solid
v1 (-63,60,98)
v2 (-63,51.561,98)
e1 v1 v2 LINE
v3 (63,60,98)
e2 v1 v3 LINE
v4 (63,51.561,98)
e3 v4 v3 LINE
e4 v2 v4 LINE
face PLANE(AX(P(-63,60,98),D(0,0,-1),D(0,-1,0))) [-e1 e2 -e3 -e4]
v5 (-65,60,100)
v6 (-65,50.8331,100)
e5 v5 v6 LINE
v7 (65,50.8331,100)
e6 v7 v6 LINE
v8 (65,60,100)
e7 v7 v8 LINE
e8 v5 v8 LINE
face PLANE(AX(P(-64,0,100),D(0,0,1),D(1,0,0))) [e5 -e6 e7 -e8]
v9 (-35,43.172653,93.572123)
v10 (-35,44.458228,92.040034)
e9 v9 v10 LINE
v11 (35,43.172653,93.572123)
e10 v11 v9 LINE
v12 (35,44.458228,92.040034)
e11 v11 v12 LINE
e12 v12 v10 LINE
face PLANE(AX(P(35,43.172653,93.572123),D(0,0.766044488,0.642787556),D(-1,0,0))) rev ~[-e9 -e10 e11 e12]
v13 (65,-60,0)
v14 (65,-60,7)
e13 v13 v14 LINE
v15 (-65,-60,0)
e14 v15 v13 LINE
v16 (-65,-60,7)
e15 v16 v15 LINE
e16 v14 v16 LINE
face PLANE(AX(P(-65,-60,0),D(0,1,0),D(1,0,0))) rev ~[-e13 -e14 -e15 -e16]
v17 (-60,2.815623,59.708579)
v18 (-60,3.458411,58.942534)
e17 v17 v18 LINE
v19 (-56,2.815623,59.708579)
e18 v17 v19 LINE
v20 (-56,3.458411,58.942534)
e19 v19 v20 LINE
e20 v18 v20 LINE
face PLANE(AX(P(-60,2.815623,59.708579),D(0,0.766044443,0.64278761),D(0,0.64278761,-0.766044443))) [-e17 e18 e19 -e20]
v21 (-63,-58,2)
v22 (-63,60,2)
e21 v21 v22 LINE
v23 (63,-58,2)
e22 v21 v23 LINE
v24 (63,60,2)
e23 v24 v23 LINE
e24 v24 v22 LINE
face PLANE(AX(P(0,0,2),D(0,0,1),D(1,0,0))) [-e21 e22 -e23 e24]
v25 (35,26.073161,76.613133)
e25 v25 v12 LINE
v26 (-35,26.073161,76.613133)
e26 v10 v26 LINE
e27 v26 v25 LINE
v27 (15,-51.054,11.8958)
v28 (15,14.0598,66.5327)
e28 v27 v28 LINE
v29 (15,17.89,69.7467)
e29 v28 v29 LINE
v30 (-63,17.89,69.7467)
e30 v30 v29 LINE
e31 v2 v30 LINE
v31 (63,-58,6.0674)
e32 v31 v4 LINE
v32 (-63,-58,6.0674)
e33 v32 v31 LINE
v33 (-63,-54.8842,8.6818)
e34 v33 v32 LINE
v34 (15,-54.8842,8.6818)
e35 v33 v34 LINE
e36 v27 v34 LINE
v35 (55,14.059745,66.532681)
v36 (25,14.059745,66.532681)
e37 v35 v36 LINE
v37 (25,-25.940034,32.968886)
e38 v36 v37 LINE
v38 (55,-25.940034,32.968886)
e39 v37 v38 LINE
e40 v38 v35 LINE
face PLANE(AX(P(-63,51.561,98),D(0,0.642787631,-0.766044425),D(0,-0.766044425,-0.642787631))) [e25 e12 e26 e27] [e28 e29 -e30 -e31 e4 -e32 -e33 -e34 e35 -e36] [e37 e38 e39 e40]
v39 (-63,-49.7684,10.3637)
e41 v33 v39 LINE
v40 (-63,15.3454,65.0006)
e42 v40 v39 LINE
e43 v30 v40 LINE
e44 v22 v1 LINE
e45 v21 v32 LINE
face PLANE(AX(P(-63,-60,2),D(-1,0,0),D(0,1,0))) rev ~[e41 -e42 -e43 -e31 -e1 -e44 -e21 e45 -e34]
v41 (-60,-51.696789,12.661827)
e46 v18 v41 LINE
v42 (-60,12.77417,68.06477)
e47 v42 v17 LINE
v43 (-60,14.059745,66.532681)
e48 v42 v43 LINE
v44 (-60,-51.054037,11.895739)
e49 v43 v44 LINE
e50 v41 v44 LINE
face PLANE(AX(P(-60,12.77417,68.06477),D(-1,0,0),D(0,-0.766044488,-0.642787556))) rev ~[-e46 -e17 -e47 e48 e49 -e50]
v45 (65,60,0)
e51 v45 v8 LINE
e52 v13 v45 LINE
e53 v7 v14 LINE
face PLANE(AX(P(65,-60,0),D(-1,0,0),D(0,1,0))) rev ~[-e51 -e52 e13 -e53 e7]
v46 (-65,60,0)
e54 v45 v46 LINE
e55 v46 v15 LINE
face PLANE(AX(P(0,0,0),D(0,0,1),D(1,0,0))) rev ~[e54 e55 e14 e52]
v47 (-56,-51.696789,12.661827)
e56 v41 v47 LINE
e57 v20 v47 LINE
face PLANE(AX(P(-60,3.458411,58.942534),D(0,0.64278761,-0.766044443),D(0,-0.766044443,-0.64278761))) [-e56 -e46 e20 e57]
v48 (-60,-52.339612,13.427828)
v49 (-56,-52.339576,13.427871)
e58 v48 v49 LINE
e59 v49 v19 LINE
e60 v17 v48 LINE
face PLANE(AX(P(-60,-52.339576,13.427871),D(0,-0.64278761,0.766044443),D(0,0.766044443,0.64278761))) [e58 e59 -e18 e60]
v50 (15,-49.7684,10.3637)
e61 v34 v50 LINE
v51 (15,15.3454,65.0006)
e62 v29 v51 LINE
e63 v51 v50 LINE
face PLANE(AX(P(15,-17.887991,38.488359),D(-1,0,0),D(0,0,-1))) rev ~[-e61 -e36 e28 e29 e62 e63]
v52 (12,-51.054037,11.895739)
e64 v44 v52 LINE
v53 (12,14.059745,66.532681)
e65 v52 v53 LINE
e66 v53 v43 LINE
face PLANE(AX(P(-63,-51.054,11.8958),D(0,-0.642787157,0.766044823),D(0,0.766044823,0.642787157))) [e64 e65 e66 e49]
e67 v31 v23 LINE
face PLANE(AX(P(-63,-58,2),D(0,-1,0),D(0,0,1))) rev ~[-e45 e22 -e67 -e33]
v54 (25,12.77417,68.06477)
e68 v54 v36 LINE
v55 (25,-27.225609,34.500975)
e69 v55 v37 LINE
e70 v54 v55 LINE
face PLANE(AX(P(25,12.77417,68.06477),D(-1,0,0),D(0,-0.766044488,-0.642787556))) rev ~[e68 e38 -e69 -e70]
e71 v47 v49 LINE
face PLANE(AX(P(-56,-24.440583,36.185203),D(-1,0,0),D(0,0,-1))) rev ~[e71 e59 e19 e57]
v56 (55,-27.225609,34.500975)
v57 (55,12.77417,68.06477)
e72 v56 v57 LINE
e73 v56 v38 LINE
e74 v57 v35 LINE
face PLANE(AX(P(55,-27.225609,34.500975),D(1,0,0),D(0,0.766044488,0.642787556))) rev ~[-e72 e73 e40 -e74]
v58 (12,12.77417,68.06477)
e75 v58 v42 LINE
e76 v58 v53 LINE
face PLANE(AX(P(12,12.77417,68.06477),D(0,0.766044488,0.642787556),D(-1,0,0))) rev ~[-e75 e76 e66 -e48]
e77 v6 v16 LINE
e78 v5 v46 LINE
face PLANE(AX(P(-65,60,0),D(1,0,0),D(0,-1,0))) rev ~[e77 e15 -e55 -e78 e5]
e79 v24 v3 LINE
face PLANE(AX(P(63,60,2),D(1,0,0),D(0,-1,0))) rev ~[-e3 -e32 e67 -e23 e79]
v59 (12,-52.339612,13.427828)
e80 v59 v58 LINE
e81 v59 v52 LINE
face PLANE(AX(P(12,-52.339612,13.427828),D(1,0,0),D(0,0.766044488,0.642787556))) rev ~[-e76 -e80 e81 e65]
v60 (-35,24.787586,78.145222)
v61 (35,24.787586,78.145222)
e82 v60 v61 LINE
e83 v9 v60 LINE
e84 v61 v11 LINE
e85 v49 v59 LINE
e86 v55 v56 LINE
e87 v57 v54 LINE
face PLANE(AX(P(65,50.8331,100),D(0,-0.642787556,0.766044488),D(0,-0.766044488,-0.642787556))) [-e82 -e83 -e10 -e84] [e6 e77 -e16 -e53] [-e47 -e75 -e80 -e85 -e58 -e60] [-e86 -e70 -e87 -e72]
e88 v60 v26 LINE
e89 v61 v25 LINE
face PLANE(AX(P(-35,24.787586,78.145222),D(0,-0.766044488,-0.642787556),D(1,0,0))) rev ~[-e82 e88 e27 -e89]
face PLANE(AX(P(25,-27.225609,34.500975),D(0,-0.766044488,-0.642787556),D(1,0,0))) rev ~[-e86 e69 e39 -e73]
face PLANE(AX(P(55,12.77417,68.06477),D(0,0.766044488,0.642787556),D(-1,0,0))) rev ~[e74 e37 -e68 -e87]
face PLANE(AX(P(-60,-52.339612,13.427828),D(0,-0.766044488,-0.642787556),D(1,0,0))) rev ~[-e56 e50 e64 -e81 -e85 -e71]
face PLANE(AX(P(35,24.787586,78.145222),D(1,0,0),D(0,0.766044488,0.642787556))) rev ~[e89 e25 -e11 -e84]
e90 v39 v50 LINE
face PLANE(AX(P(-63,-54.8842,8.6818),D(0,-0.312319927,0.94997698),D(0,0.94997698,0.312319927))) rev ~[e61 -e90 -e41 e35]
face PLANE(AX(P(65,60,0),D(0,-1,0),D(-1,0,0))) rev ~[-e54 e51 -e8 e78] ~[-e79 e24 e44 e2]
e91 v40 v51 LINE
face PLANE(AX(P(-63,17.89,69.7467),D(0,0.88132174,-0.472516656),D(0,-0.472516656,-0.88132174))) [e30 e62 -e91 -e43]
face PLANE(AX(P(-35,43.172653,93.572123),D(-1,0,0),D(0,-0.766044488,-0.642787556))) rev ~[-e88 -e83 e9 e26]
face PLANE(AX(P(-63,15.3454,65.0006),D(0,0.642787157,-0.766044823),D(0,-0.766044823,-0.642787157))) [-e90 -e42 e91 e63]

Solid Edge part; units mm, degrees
sketch "Sketch1" plane through (0, 0, 0) normal (0, 0, 1) x (1, 0, 0)
  line L0 (-65, -60) -> (65, -60)
  line L1 (65, -60) -> (65, 60)
  line L2 (65, 60) -> (-65, 60)
  line L3 (-65, 60) -> (-65, -60)
extrude "Protrusion1" add sketch "Sketch1" along normal blind 2
sketch "Sketch2" plane through (0, 0, 2) normal (0, 0, 1) x (1, 0, 0)
  line L0 (-65, -60) -> (-63, -60)
  line L1 (-63, -60) -> (-63, 60)
  line L2 (-63, 60) -> (-65, 60)
  line L3 (-65, 60) -> (-65, -60)
  line L4 (65, 60) -> (63, 60)
  line L5 (63, 60) -> (63, -60)
  line L6 (63, -60) -> (65, -60)
  line L7 (65, -60) -> (65, 60)
extrude "Protrusion2" add sketch "Sketch2" along normal blind 98
sketch "Sketch3" plane through (65, 0, 51) normal (1, 0, 0) x (0, 1, 0)
  line L0 (-60, 49) -> (-60, -44)
  line L1 (50.8331, 49) -> (-60, -44)
  line L2 (50.8331, 49) -> (-60, 49)
extrude "ExtrudedCutout_1" cut sketch "Sketch3" against normal blind 130
sketch "Sketch4" plane through (-63, 0, 52) normal (1, 0, 0) x (0, 1, 0)
  line L0 (-60, -45) -> (-60, -50)
  line L1 (-60, -50) -> (-58, -50)
  line L2 (-58, -50) -> (-58, -45.9326)
  line L3 (51.561, 46) -> (-58, -45.9326)
  line L4 (60, 46) -> (51.561, 46)
  line L5 (60, 48) -> (60, 46)
  line L6 (60, 48) -> (50.8331, 48)
  line L7 (50.8331, 48) -> (-60, -45)
extrude "Protrusion3" add sketch "Sketch4" along normal up to vertex (128 mm away)
sketch "Sketch5" plane through (0, -4.5835, 53.5) normal (0, -0.6427876, 0.7660444) x (1, 0, 0)
  line L0 (35, 62.3412) -> (-35, 62.3412)
  line L1 (-35, 62.3412) -> (-35, 38.3412)
  line L2 (-35, 38.3412) -> (35, 38.3412)
  line L3 (35, 38.3412) -> (35, 62.3412)
  dimension "D1" = 10
extrude "Cutout1" cut sketch "Sketch5" against normal blind 2
sketch "Sketch6" plane through (0, -4.5835, 53.5) normal (0, -0.6427876, 0.7660444) x (1, 0, 0)
  line L0 (-60, -62.3412) -> (12, -62.3412)
  line L1 (12, -62.3412) -> (12, 22.6588)
  line L2 (12, 22.6588) -> (-60, 22.6588)
  line L3 (-60, 22.6588) -> (-60, -62.3412)
  dimension "D1" = 85
  dimension "D2" = 72
extrude "ExtrudedCutout_3" cut sketch "Sketch6" against normal blind 2
sketch "Sketch7" plane through (0, -4.5835, 53.5) normal (0, -0.6427876, 0.7660444) x (1, 0, 0)
  line L0 (25, -29.5572) -> (55, -29.5572)
  line L1 (55, -29.5572) -> (55, 22.6588)
  line L2 (55, 22.6588) -> (25, 22.6588)
  line L3 (25, 22.6588) -> (25, -29.5572)
  dimension "D1" = 52.216
  dimension "D2" = 30
  dimension "D3" = 10
extrude "Cutout2" cut sketch "Sketch7" against normal blind 2
sketch "Sketch8" plane through (-63, 1, 50) normal (1, 0, 0) x (0, 1, 0)
  line L0 (14.3454, 15.0006) -> (-50.7684, -39.6363)
  line L1 (-55.8842, -41.3182) -> (-50.7684, -39.6363)
  line L2 (-52.054, -38.1042) -> (-55.8842, -41.3182)
  line L3 (-52.054, -38.1042) -> (13.0598, 16.5327)
  line L4 (13.0598, 16.5327) -> (16.89, 19.7467)
  line L5 (16.89, 19.7467) -> (14.3454, 15.0006)
extrude "ExtrudedProtrusion_6" add sketch "Sketch8" along normal blind 78
sketch "Sketch9" plane through (-60, -19.1399, 39.9803) normal (1, 0, 0) x (0, 0.7660444, 0.6427876)
  line L0 (-42.5, 1) -> (29.5, 1)
  line L1 (29.5, 1) -> (29.5, 0)
  line L2 (29.5, 0) -> (-42.5, 0)
  line L3 (-42.5, 0) -> (-42.5, 1)
extrude "ExtrudedProtrusion_7" add sketch "Sketch9" along normal blind 4
